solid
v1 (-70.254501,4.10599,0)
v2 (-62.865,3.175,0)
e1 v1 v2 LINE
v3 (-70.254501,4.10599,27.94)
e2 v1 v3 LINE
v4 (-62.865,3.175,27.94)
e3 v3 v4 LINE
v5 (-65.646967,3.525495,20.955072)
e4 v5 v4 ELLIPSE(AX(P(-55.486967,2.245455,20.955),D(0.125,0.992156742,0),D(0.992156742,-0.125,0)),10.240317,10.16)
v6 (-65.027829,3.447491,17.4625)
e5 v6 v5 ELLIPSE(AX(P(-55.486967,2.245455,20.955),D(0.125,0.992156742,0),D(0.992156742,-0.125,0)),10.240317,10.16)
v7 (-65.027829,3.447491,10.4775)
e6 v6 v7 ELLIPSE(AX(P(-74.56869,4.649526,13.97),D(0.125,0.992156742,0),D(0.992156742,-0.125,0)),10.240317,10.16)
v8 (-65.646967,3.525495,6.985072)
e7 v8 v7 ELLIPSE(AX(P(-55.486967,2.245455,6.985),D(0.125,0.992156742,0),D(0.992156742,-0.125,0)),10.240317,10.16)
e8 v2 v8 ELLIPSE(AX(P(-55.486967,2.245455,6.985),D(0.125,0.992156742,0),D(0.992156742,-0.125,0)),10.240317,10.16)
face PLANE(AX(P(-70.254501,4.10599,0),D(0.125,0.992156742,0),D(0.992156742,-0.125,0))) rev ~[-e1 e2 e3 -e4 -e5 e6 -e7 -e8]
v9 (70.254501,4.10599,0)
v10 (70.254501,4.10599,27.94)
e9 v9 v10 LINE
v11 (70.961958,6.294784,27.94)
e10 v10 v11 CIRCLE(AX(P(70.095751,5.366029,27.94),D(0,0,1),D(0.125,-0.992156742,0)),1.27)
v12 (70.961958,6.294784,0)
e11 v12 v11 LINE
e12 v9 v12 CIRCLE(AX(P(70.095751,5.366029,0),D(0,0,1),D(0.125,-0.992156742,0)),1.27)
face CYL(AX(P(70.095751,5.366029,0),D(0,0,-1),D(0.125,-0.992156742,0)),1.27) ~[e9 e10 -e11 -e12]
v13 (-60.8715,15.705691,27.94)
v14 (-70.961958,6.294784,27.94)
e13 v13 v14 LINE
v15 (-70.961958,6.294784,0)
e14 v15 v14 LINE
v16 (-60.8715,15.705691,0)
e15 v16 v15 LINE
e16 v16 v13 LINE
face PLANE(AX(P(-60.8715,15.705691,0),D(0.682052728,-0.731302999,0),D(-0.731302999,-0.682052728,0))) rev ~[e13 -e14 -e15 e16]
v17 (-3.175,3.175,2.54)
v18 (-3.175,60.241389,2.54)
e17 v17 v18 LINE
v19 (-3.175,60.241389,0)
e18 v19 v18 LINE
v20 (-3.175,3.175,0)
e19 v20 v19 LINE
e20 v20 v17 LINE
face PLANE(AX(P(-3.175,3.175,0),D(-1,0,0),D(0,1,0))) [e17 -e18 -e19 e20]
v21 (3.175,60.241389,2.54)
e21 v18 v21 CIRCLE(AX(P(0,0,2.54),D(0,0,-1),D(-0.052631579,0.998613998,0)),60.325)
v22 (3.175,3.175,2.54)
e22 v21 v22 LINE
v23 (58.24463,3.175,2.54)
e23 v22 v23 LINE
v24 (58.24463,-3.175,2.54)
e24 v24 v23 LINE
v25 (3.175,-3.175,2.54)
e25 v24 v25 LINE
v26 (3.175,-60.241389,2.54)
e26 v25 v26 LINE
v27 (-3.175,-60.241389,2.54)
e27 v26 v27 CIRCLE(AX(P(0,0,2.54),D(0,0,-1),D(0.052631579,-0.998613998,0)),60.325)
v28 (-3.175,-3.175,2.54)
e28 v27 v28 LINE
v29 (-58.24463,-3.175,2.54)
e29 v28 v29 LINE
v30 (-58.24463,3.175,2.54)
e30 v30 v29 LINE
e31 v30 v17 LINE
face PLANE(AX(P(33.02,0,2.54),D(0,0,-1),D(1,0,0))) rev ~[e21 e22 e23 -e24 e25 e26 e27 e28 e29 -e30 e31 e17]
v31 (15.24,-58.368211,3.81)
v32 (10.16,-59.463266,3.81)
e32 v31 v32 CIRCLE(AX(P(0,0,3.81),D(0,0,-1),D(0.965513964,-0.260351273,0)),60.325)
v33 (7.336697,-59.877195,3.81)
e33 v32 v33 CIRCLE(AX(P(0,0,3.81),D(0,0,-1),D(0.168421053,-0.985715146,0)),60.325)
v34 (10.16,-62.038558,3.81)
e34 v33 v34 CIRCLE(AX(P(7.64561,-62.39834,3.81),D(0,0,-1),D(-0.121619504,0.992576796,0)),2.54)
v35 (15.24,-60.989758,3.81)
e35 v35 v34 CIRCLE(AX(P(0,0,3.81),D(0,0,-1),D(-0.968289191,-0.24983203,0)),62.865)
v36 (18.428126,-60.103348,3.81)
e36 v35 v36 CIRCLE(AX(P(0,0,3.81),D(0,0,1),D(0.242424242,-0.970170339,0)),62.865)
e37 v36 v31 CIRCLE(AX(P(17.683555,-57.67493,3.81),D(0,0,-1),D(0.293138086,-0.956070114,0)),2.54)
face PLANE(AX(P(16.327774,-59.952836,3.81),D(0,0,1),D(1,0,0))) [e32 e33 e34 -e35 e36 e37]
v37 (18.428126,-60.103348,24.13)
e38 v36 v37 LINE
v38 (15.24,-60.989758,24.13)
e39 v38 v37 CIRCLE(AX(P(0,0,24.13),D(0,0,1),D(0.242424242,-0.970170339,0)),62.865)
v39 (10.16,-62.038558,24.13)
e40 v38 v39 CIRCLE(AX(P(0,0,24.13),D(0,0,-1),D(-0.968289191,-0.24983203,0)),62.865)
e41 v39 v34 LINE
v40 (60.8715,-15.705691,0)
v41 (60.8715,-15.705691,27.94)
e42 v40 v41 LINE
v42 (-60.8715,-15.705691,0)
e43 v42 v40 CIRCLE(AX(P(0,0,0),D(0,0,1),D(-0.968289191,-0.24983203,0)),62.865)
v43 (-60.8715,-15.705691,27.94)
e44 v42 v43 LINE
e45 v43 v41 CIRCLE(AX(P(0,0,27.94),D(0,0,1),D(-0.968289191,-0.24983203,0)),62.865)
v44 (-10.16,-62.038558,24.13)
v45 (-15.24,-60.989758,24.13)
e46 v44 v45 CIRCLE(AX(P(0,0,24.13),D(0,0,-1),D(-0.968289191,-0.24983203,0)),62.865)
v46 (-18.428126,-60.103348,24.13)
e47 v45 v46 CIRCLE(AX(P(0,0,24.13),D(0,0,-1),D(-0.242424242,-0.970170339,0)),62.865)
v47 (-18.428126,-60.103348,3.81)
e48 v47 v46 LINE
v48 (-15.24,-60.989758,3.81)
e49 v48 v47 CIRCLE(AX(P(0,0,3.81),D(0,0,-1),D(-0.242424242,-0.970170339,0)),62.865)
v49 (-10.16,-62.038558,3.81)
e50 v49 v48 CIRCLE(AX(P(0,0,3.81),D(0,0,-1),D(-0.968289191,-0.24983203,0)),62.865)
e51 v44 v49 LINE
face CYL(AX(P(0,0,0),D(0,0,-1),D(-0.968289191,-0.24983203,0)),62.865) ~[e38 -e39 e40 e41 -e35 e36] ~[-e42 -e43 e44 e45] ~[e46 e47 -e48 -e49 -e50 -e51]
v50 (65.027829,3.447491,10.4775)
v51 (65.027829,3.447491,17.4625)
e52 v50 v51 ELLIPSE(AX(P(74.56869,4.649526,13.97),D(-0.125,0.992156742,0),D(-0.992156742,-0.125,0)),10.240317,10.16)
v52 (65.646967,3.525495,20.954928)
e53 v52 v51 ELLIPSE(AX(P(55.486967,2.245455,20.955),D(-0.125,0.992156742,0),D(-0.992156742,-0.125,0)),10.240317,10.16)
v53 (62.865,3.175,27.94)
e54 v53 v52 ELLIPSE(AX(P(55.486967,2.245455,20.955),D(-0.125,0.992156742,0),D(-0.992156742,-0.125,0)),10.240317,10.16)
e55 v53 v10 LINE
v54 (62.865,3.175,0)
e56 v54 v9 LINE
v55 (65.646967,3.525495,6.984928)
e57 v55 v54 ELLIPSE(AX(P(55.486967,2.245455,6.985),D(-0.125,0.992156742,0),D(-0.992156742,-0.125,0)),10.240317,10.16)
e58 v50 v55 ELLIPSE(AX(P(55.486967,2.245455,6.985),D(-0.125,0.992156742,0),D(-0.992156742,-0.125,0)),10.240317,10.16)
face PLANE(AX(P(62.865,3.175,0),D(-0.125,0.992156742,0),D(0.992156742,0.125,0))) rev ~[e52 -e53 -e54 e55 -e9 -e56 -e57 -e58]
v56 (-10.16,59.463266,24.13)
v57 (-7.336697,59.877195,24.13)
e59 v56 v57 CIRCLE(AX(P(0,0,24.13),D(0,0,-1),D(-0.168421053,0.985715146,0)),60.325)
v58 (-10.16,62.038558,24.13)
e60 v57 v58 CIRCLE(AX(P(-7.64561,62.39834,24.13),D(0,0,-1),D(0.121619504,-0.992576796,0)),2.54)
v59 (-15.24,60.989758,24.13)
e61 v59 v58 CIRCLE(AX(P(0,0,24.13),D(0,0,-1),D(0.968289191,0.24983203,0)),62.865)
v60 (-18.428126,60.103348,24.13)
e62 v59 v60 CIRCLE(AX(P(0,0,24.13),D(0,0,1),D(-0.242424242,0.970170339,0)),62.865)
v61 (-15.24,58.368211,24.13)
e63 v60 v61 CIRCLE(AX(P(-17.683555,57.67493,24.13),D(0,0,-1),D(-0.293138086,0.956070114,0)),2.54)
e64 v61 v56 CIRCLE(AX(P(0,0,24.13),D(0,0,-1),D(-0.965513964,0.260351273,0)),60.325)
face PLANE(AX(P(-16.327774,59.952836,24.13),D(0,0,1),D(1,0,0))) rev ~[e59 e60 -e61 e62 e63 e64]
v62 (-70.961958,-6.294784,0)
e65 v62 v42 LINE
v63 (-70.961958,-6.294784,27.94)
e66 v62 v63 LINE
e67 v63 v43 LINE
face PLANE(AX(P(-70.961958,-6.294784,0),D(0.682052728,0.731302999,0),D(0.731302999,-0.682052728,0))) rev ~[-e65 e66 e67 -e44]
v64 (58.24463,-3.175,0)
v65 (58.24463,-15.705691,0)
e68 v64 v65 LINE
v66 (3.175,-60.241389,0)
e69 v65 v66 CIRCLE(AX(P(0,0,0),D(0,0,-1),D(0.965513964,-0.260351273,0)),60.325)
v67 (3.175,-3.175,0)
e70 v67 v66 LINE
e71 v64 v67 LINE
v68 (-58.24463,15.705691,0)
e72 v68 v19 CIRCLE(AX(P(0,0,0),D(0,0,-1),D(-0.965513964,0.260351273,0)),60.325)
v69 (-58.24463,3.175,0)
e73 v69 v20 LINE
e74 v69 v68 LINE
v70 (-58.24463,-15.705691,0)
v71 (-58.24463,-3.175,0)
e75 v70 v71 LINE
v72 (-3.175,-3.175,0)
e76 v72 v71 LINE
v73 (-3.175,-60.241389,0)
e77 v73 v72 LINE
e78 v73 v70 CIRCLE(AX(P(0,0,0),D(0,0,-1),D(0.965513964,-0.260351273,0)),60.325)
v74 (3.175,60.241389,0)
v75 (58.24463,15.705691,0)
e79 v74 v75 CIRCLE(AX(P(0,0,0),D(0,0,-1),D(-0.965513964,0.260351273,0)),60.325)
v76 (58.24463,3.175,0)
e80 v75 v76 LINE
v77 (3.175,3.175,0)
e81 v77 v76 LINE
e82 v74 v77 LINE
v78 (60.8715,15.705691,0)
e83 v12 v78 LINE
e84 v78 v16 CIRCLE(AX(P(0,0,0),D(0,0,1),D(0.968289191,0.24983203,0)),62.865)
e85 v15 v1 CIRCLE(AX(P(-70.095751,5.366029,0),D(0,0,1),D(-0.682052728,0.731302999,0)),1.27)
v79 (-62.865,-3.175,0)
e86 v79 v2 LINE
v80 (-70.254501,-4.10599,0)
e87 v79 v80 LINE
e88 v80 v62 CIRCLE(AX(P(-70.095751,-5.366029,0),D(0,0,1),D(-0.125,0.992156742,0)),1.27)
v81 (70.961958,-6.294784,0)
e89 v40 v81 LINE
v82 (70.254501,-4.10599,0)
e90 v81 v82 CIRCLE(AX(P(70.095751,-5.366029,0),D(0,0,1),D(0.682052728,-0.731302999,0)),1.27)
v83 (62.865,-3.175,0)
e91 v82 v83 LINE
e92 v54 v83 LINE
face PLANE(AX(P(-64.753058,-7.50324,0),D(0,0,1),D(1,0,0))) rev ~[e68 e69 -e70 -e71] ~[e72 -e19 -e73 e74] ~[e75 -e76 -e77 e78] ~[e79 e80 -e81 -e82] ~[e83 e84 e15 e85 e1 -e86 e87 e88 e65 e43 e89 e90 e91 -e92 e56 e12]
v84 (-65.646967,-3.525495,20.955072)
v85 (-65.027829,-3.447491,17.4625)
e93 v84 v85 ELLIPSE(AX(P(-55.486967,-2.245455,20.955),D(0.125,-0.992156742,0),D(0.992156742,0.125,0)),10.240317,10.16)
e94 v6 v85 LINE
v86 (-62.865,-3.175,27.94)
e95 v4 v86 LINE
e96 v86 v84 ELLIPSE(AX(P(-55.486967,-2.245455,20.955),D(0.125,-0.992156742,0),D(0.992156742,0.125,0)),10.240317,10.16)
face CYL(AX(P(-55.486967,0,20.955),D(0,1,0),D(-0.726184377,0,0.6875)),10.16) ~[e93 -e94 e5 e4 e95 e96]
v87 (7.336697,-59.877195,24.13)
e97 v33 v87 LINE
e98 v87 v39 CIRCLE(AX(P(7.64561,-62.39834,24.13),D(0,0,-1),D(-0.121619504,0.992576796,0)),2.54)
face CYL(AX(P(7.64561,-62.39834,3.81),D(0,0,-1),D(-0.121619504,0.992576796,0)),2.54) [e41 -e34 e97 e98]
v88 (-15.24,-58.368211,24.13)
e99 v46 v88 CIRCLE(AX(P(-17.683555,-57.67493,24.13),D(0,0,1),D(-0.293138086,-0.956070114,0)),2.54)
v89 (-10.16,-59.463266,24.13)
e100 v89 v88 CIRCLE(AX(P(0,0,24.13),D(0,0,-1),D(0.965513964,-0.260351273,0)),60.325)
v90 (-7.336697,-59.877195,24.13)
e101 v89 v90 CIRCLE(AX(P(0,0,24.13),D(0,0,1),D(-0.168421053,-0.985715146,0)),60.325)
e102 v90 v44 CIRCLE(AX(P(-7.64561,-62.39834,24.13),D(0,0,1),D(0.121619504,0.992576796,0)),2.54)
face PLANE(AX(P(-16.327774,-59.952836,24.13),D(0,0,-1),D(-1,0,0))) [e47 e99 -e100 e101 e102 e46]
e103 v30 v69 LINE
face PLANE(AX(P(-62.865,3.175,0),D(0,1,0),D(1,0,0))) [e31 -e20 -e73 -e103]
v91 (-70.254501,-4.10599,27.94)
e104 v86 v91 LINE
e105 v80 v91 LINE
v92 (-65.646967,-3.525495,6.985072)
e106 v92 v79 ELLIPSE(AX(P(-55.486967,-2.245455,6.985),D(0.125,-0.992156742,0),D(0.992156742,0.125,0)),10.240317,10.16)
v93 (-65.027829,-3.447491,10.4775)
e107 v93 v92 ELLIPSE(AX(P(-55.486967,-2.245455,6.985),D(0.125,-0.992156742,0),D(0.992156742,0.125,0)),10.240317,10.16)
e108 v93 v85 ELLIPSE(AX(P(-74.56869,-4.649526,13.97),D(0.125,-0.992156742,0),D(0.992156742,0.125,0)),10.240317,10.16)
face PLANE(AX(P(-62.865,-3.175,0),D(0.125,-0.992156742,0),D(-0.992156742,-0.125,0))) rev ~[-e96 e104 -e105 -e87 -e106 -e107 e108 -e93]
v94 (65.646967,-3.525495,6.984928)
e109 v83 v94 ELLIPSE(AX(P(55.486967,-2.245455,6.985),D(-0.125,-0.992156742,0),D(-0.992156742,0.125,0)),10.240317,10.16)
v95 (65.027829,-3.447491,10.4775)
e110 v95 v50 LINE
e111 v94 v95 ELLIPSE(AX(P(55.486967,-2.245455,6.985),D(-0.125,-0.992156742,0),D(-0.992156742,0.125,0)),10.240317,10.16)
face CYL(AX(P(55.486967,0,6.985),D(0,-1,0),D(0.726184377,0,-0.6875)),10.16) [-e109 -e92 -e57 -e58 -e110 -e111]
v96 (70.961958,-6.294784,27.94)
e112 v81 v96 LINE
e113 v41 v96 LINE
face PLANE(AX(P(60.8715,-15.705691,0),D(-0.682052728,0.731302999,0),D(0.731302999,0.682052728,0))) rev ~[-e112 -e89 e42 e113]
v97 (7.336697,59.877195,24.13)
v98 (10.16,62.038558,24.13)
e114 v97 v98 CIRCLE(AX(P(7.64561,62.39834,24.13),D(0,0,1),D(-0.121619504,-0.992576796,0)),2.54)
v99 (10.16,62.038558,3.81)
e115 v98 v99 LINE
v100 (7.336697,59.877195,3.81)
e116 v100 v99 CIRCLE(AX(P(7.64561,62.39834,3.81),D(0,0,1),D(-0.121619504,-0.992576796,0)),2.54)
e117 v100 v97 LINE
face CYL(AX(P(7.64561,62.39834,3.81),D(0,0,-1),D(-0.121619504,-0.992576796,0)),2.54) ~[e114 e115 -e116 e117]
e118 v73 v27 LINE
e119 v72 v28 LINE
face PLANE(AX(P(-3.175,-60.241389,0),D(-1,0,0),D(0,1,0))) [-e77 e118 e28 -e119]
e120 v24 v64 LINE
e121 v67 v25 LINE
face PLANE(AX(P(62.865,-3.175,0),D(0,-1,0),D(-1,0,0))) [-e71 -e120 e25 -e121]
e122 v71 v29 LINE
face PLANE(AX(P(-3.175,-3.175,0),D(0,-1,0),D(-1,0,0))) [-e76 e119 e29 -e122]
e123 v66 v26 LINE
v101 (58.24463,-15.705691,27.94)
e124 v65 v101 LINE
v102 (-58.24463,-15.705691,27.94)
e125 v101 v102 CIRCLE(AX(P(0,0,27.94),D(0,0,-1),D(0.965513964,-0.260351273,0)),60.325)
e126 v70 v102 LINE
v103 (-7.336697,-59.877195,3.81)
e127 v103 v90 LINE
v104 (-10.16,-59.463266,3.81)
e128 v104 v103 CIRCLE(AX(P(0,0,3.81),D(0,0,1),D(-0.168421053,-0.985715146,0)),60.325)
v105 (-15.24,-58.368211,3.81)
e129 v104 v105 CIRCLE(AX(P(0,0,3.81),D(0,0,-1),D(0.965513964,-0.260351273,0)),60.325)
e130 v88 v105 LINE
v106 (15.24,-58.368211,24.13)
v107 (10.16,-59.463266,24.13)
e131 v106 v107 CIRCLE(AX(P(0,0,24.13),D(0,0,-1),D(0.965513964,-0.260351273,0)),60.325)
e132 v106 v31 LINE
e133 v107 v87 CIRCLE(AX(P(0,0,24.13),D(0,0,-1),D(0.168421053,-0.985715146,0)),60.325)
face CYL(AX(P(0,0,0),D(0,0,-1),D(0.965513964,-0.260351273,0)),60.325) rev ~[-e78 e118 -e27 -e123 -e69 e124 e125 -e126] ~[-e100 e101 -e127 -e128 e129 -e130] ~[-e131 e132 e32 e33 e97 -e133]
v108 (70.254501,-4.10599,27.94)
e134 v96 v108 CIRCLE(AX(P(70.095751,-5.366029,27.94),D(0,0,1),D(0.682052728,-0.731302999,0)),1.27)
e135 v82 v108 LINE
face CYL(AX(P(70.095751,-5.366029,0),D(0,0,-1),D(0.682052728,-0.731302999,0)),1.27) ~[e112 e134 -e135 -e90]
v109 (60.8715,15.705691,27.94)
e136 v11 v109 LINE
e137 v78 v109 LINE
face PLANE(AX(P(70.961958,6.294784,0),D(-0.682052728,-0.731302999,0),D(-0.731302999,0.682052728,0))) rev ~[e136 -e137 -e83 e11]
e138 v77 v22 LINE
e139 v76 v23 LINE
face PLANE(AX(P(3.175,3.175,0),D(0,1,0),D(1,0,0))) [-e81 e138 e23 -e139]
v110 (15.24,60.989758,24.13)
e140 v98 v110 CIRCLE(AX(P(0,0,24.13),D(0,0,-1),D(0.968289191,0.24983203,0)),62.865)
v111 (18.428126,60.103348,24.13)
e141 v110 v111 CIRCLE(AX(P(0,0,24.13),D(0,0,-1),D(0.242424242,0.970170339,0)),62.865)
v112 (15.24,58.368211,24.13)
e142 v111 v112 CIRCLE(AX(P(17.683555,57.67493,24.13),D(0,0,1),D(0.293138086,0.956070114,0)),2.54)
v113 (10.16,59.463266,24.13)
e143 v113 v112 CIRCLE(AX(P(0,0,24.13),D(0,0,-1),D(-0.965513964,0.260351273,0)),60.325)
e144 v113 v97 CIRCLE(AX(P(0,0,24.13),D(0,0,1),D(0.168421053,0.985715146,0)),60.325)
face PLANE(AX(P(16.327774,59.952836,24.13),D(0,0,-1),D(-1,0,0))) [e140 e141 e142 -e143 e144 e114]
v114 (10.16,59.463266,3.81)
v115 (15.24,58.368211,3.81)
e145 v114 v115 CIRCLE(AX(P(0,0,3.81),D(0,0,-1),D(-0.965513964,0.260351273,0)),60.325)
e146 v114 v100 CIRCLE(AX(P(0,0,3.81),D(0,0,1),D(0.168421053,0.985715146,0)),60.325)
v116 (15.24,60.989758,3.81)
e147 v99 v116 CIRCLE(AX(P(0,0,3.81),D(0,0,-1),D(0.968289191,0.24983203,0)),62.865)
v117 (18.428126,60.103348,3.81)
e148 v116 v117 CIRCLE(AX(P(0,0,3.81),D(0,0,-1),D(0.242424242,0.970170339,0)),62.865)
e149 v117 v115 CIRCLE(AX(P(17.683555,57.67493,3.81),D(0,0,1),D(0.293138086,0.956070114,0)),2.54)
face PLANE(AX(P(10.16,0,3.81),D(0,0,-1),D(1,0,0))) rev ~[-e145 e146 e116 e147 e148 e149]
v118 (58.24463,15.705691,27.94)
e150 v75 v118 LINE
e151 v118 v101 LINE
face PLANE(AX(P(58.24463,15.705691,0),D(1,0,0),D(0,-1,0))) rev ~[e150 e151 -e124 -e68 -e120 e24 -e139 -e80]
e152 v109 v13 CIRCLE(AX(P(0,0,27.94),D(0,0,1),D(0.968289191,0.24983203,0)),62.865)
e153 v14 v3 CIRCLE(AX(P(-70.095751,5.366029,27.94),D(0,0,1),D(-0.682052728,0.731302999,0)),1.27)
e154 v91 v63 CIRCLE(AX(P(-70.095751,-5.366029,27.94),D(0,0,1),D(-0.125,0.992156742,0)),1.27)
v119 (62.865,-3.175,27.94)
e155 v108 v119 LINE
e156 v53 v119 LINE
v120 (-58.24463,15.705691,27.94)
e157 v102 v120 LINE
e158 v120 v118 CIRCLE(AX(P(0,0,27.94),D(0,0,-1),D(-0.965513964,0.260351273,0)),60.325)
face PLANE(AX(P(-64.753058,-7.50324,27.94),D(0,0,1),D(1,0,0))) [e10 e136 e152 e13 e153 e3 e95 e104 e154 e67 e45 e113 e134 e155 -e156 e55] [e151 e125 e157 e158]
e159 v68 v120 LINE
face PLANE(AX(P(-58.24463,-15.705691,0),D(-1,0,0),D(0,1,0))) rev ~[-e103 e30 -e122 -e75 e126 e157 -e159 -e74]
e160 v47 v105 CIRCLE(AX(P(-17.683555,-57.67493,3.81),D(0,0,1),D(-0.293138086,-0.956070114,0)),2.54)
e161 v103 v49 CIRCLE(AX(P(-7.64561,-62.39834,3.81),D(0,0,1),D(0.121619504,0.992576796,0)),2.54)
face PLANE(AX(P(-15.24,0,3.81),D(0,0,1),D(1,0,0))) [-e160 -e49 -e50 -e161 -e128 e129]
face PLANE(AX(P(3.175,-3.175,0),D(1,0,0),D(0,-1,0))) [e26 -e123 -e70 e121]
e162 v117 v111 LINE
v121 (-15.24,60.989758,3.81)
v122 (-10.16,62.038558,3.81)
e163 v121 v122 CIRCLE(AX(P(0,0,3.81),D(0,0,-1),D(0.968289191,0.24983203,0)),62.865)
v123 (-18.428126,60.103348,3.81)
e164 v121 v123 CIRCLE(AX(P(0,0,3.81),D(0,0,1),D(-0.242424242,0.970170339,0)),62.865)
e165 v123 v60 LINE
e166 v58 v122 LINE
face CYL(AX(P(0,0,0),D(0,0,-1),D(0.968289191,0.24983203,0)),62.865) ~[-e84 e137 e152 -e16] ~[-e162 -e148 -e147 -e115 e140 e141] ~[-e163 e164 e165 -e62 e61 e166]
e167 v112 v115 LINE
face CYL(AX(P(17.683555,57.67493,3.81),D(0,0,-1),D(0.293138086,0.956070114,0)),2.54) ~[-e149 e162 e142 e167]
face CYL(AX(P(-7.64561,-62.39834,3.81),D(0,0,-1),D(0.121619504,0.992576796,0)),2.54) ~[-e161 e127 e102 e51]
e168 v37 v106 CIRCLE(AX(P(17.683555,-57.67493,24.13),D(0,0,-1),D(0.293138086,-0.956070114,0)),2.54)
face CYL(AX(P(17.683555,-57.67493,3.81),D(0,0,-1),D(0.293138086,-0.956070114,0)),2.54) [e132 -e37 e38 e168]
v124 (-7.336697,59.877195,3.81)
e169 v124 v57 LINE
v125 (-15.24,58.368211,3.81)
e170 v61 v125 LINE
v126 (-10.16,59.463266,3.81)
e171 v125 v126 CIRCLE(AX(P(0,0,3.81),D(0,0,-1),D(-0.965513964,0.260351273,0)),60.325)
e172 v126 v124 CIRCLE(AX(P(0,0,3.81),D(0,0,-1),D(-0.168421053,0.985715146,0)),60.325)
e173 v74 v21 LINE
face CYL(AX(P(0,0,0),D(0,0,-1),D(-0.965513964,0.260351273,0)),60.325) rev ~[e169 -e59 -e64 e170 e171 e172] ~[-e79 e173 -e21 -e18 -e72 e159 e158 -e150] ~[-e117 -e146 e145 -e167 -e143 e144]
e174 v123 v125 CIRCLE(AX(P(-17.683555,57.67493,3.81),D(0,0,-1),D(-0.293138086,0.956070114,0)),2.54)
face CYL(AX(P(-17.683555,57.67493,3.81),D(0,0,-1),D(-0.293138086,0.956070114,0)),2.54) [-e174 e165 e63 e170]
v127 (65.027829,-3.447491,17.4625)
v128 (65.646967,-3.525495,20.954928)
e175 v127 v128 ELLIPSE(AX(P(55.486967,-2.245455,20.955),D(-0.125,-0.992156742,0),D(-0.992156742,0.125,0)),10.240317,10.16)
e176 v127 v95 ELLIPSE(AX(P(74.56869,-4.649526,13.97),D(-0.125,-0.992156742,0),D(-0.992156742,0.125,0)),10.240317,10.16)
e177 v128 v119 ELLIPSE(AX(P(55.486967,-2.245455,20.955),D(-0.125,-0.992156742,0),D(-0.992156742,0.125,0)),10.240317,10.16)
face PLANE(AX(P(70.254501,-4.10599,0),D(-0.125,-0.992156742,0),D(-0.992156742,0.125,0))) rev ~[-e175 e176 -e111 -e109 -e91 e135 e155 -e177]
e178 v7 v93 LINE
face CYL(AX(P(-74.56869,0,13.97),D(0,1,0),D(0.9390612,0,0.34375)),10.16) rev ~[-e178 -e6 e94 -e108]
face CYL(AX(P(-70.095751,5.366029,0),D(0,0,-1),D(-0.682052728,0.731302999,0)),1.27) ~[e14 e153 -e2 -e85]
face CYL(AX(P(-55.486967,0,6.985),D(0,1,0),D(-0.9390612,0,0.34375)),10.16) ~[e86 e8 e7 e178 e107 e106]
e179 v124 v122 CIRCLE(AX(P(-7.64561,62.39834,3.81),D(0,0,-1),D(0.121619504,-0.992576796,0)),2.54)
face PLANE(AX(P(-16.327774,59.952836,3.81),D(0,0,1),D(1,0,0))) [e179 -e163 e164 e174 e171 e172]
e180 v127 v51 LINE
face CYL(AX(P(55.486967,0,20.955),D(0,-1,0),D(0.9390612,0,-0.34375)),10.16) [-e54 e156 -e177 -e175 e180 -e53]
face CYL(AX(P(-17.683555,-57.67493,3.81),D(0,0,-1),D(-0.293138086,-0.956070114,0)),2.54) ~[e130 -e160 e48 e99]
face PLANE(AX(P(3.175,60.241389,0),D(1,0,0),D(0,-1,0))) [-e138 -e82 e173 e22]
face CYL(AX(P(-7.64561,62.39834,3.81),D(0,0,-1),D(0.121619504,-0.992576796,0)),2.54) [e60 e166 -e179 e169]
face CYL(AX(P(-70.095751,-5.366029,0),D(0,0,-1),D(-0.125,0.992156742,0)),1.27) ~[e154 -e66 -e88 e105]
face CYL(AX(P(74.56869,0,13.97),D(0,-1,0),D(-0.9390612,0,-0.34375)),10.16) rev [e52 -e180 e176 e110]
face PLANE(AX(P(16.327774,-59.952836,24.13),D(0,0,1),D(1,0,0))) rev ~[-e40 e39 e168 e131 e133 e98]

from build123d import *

# Parameters (mm, degrees)
F1_DEPTH      = 27.94
F2_W          = 59.69
F2_H          = 6.35
F2_W_2        = 6.35
F3_DEPTH      = 2.54
F4_W          = 5.08
F4_H          = 20.32
F5_DEPTH      = 62.866
F5_DEPTH_BACK = 62.866
F6_T1_DEPTH   = 20.32
F8_DEPTH      = 3.5254948624
F8_DEPTH_BACK = 3.5254948624


# Not quite as in the source:
# - a fillet or chamfer that OpenCascade refuses, or shapes differently, is made with other operations: its cross-section is extruded or revolved along the edge and cut away or added


with BuildPart() as f1:
    # F0 (on Top) → F1 (new body)
    with BuildSketch(Plane.XY):
        with BuildLine():
            Line((-70.9619581652, -6.2947835132), (-60.8714999798, -15.7056905359))
            ThreePointArc((-60.8714999798, -15.7056905359), (-62.3646336926, -7.9158505156), (-62.865, 0))
            Line((-62.865, 0), (-62.865, -3.175))
            Line((-62.865, -3.175), (-70.254501201, -4.1059896424))
            ThreePointArc((-70.254501201, -4.1059896424), (-71.304196006, -4.9754379298), (-70.9619581652, -6.2947835132))
        make_face()
        with BuildLine():
            ThreePointArc((-58.2446298794, 15.7056905359), (0, 60.325), (58.2446298794, 15.7056905359))
            Line((58.2446298794, 15.7056905359), (60.8714999798, 15.7056905359))
            ThreePointArc((60.8714999798, 15.7056905359), (0, 62.865), (-60.8714999798, 15.7056905359))
            Line((-60.8714999798, 15.7056905359), (-58.2446298794, 15.7056905359))
        make_face()
        with BuildLine():
            ThreePointArc((-58.2446298794, -15.7056905359), (-60.325, 0), (-58.2446298794, 15.7056905359))
            Line((-58.2446298794, 15.7056905359), (-60.8714999798, 15.7056905359))
            ThreePointArc((-60.8714999798, 15.7056905359), (-62.3646336926, 7.9158505156), (-62.865, 0))
            ThreePointArc((-62.865, 0), (-62.3646336926, -7.9158505156), (-60.8714999798, -15.7056905359))
            Line((-60.8714999798, -15.7056905359), (-58.2446298794, -15.7056905359))
        make_face()
        with BuildLine():
            Line((60.8714999798, -15.7056905359), (58.2446298794, -15.7056905359))
            ThreePointArc((58.2446298794, -15.7056905359), (0, -60.325), (-58.2446298794, -15.7056905359))
            Line((-58.2446298794, -15.7056905359), (-60.8714999798, -15.7056905359))
            ThreePointArc((-60.8714999798, -15.7056905359), (0, -62.865), (60.8714999798, -15.7056905359))
        make_face()
        with BuildLine():
            ThreePointArc((58.2446298794, 15.7056905359), (59.8026459384, 7.9214369758), (60.325, 0))
            ThreePointArc((60.325, 0), (59.8026459384, -7.9214369758), (58.2446298794, -15.7056905359))
            Line((58.2446298794, -15.7056905359), (60.8714999798, -15.7056905359))
            ThreePointArc((60.8714999798, -15.7056905359), (62.3646336926, -7.9158505156), (62.865, 0))
            ThreePointArc((62.865, 0), (62.3646336926, 7.9158505156), (60.8714999798, 15.7056905359))
            Line((60.8714999798, 15.7056905359), (58.2446298794, 15.7056905359))
        make_face()
        with BuildLine():
            Line((70.9619581652, 6.2947835132), (60.8714999798, 15.7056905359))
            ThreePointArc((60.8714999798, 15.7056905359), (62.3646336926, 7.9158505156), (62.865, 0))
            Line((62.865, 0), (62.865, 3.175))
            Line((62.865, 3.175), (70.254501201, 4.1059896424))
            ThreePointArc((70.254501201, 4.1059896424), (71.304196006, 4.9754379298), (70.9619581652, 6.2947835132))
        make_face()
        with BuildLine():
            ThreePointArc((62.865, 0), (62.3646336926, -7.9158505156), (60.8714999798, -15.7056905359))
            Line((60.8714999798, -15.7056905359), (70.9619581652, -6.2947835132))
            ThreePointArc((70.9619581652, -6.2947835132), (71.304196006, -4.9754379298), (70.254501201, -4.1059896424))
            Line((70.254501201, -4.1059896424), (62.865, -3.175))
            Line((62.865, -3.175), (62.865, 0))
        make_face()
        with BuildLine():
            ThreePointArc((-62.865, 0), (-62.3646336926, 7.9158505156), (-60.8714999798, 15.7056905359))
            Line((-60.8714999798, 15.7056905359), (-70.9619581652, 6.2947835132))
            ThreePointArc((-70.9619581652, 6.2947835132), (-71.304196006, 4.9754379298), (-70.254501201, 4.1059896424))
            Line((-70.254501201, 4.1059896424), (-62.865, 3.175))
            Line((-62.865, 3.175), (-62.865, 0))
        make_face()
        with BuildLine():
            ThreePointArc((58.2446298794, -15.7056905359), (59.8026459384, -7.9214369758), (60.325, 0))
            ThreePointArc((60.325, 0), (59.8026459384, 7.9214369758), (58.2446298794, 15.7056905359))
            Line((58.2446298794, 15.7056905359), (58.2446298794, -15.7056905359))
        make_face()
        with BuildLine():
            Line((-58.2446298794, -15.7056905359), (-58.2446298794, 15.7056905359))
            ThreePointArc((-58.2446298794, 15.7056905359), (-60.325, 0), (-58.2446298794, -15.7056905359))
        make_face()
    extrude(amount=F1_DEPTH)

    # F2 (on face) → F3 (join)
    with BuildSketch(Plane(origin=(0, 0, 0), x_dir=(1, 0, 0), z_dir=(0, 0, -1))):
        with Locations((33.02, 0)):
            Rectangle(F2_W, F2_H)
        Rectangle(F2_W_2, F2_H)
        with Locations((-33.02, 0)):
            Rectangle(F2_W, F2_H)
        with BuildLine():
            Line((-3.175, 3.175), (3.175, 3.175))
            Line((3.175, 3.175), (3.175, 60.2413894262))
            ThreePointArc((3.175, 60.2413894262), (0, 60.325), (-3.175, 60.2413894262))
            Line((-3.175, 60.2413894262), (-3.175, 3.175))
        make_face()
        with BuildLine():
            Line((3.175, -60.2413894262), (3.175, -3.175))
            Line((3.175, -3.175), (-3.175, -3.175))
            Line((-3.175, -3.175), (-3.175, -60.2413894262))
            ThreePointArc((-3.175, -60.2413894262), (0, -60.325), (3.175, -60.2413894262))
        make_face()
    extrude(amount=-F3_DEPTH)

    # F4 (on Front) → F5 (cut, two sides)
    with BuildSketch(Plane.XZ) as f5_sk:
        with Locations((-12.7, 13.97)):
            Rectangle(F4_W, F4_H)
        with Locations((12.7, 13.97)):
            Rectangle(F4_W, F4_H)
    extrude(amount=-F5_DEPTH, mode=Mode.SUBTRACT)
    extrude(f5_sk.sketch, amount=F5_DEPTH_BACK, mode=Mode.SUBTRACT)

    # F6: fillet of radius 2.54 on 8 edges, made by hand

    # F6_s2 → F6_t1 (cut)
    with BuildSketch(Plane.XY.offset(3.81)):
        with BuildLine():
            ThreePointArc((18.4281257881, 60.1033477016), (16.4693425511, 59.9059132544), (15.24, 58.3682107401))
            Line((15.24, 58.3682107401), (15.24, 60.9897583615))
            ThreePointArc((15.24, 60.9897583615), (16.8398962136, 60.5675335515), (18.4281257881, 60.1033477016))
        make_face()
        with BuildLine():
            ThreePointArc((-18.4281257881, 60.1033477016), (-16.4693425511, 59.9059132544), (-15.24, 58.3682107401))
            Line((-15.24, 58.3682107401), (-15.24, 60.9897583615))
            ThreePointArc((-15.24, 60.9897583615), (-16.8398962136, 60.5675335515), (-18.4281257881, 60.1033477016))
        make_face()
        with BuildLine():
            ThreePointArc((7.3366965941, 59.8771952256), (9.1895995283, 60.3814871069), (10.16, 62.038557567))
            Line((10.16, 62.038557567), (10.16, 59.4632661817))
            ThreePointArc((10.16, 59.4632661817), (8.7507960918, 59.6869264811), (7.3366965941, 59.8771952256))
        make_face()
        with BuildLine():
            ThreePointArc((-7.3366965941, 59.8771952256), (-9.1895995283, 60.3814871069), (-10.16, 62.038557567))
            Line((-10.16, 62.038557567), (-10.16, 59.4632661817))
            ThreePointArc((-10.16, 59.4632661817), (-8.7507960918, 59.6869264811), (-7.3366965941, 59.8771952256))
        make_face()
        with BuildLine():
            ThreePointArc((-18.4281257881, -60.1033477016), (-16.4693425511, -59.9059132544), (-15.24, -58.3682107401))
            Line((-15.24, -58.3682107401), (-15.24, -60.9897583615))
            ThreePointArc((-15.24, -60.9897583615), (-16.8398962136, -60.5675335515), (-18.4281257881, -60.1033477016))
        make_face()
        with BuildLine():
            ThreePointArc((18.4281257881, -60.1033477016), (16.4693425511, -59.9059132544), (15.24, -58.3682107401))
            Line((15.24, -58.3682107401), (15.24, -60.9897583615))
            ThreePointArc((15.24, -60.9897583615), (16.8398962136, -60.5675335515), (18.4281257881, -60.1033477016))
        make_face()
        with BuildLine():
            ThreePointArc((7.3366965941, -59.8771952256), (9.1895995283, -60.3814871069), (10.16, -62.038557567))
            Line((10.16, -62.038557567), (10.16, -59.4632661817))
            ThreePointArc((10.16, -59.4632661817), (8.7507960918, -59.6869264811), (7.3366965941, -59.8771952256))
        make_face()
        with BuildLine():
            ThreePointArc((-7.3366965941, -59.8771952256), (-9.1895995283, -60.3814871069), (-10.16, -62.038557567))
            Line((-10.16, -62.038557567), (-10.16, -59.4632661817))
            ThreePointArc((-10.16, -59.4632661817), (-8.7507960918, -59.6869264811), (-7.3366965941, -59.8771952256))
        make_face()
    extrude(amount=F6_T1_DEPTH, mode=Mode.SUBTRACT)

    # F7 (on Front) → F8 (join, two sides)
    with BuildSketch(Plane.XZ) as f8_sk:
        with BuildLine():
            ThreePointArc((65.0278285183, 17.4625), (65.4371804989, 23.0089829265), (62.865, 27.94))
            Line((62.865, 27.94), (62.865, 0))
            ThreePointArc((62.865, 0), (65.4371804989, 4.9310170735), (65.0278285183, 10.4775))
            ThreePointArc((65.0278285183, 10.4775), (64.4086903111, 13.97), (65.0278285183, 17.4625))
        make_face()
        with BuildLine():
            ThreePointArc((-65.0278285183, 10.4775), (-65.4371804989, 4.9310170735), (-62.865, 0))
            Line((-62.865, 0), (-62.865, 27.94))
            ThreePointArc((-62.865, 27.94), (-65.4371804989, 23.0089829265), (-65.0278285183, 17.4625))
            ThreePointArc((-65.0278285183, 17.4625), (-64.4086903111, 13.97), (-65.0278285183, 10.4775))
        make_face()
    extrude(amount=F8_DEPTH)
    extrude(f8_sk.sketch, amount=-F8_DEPTH_BACK)


solid = f1.part
